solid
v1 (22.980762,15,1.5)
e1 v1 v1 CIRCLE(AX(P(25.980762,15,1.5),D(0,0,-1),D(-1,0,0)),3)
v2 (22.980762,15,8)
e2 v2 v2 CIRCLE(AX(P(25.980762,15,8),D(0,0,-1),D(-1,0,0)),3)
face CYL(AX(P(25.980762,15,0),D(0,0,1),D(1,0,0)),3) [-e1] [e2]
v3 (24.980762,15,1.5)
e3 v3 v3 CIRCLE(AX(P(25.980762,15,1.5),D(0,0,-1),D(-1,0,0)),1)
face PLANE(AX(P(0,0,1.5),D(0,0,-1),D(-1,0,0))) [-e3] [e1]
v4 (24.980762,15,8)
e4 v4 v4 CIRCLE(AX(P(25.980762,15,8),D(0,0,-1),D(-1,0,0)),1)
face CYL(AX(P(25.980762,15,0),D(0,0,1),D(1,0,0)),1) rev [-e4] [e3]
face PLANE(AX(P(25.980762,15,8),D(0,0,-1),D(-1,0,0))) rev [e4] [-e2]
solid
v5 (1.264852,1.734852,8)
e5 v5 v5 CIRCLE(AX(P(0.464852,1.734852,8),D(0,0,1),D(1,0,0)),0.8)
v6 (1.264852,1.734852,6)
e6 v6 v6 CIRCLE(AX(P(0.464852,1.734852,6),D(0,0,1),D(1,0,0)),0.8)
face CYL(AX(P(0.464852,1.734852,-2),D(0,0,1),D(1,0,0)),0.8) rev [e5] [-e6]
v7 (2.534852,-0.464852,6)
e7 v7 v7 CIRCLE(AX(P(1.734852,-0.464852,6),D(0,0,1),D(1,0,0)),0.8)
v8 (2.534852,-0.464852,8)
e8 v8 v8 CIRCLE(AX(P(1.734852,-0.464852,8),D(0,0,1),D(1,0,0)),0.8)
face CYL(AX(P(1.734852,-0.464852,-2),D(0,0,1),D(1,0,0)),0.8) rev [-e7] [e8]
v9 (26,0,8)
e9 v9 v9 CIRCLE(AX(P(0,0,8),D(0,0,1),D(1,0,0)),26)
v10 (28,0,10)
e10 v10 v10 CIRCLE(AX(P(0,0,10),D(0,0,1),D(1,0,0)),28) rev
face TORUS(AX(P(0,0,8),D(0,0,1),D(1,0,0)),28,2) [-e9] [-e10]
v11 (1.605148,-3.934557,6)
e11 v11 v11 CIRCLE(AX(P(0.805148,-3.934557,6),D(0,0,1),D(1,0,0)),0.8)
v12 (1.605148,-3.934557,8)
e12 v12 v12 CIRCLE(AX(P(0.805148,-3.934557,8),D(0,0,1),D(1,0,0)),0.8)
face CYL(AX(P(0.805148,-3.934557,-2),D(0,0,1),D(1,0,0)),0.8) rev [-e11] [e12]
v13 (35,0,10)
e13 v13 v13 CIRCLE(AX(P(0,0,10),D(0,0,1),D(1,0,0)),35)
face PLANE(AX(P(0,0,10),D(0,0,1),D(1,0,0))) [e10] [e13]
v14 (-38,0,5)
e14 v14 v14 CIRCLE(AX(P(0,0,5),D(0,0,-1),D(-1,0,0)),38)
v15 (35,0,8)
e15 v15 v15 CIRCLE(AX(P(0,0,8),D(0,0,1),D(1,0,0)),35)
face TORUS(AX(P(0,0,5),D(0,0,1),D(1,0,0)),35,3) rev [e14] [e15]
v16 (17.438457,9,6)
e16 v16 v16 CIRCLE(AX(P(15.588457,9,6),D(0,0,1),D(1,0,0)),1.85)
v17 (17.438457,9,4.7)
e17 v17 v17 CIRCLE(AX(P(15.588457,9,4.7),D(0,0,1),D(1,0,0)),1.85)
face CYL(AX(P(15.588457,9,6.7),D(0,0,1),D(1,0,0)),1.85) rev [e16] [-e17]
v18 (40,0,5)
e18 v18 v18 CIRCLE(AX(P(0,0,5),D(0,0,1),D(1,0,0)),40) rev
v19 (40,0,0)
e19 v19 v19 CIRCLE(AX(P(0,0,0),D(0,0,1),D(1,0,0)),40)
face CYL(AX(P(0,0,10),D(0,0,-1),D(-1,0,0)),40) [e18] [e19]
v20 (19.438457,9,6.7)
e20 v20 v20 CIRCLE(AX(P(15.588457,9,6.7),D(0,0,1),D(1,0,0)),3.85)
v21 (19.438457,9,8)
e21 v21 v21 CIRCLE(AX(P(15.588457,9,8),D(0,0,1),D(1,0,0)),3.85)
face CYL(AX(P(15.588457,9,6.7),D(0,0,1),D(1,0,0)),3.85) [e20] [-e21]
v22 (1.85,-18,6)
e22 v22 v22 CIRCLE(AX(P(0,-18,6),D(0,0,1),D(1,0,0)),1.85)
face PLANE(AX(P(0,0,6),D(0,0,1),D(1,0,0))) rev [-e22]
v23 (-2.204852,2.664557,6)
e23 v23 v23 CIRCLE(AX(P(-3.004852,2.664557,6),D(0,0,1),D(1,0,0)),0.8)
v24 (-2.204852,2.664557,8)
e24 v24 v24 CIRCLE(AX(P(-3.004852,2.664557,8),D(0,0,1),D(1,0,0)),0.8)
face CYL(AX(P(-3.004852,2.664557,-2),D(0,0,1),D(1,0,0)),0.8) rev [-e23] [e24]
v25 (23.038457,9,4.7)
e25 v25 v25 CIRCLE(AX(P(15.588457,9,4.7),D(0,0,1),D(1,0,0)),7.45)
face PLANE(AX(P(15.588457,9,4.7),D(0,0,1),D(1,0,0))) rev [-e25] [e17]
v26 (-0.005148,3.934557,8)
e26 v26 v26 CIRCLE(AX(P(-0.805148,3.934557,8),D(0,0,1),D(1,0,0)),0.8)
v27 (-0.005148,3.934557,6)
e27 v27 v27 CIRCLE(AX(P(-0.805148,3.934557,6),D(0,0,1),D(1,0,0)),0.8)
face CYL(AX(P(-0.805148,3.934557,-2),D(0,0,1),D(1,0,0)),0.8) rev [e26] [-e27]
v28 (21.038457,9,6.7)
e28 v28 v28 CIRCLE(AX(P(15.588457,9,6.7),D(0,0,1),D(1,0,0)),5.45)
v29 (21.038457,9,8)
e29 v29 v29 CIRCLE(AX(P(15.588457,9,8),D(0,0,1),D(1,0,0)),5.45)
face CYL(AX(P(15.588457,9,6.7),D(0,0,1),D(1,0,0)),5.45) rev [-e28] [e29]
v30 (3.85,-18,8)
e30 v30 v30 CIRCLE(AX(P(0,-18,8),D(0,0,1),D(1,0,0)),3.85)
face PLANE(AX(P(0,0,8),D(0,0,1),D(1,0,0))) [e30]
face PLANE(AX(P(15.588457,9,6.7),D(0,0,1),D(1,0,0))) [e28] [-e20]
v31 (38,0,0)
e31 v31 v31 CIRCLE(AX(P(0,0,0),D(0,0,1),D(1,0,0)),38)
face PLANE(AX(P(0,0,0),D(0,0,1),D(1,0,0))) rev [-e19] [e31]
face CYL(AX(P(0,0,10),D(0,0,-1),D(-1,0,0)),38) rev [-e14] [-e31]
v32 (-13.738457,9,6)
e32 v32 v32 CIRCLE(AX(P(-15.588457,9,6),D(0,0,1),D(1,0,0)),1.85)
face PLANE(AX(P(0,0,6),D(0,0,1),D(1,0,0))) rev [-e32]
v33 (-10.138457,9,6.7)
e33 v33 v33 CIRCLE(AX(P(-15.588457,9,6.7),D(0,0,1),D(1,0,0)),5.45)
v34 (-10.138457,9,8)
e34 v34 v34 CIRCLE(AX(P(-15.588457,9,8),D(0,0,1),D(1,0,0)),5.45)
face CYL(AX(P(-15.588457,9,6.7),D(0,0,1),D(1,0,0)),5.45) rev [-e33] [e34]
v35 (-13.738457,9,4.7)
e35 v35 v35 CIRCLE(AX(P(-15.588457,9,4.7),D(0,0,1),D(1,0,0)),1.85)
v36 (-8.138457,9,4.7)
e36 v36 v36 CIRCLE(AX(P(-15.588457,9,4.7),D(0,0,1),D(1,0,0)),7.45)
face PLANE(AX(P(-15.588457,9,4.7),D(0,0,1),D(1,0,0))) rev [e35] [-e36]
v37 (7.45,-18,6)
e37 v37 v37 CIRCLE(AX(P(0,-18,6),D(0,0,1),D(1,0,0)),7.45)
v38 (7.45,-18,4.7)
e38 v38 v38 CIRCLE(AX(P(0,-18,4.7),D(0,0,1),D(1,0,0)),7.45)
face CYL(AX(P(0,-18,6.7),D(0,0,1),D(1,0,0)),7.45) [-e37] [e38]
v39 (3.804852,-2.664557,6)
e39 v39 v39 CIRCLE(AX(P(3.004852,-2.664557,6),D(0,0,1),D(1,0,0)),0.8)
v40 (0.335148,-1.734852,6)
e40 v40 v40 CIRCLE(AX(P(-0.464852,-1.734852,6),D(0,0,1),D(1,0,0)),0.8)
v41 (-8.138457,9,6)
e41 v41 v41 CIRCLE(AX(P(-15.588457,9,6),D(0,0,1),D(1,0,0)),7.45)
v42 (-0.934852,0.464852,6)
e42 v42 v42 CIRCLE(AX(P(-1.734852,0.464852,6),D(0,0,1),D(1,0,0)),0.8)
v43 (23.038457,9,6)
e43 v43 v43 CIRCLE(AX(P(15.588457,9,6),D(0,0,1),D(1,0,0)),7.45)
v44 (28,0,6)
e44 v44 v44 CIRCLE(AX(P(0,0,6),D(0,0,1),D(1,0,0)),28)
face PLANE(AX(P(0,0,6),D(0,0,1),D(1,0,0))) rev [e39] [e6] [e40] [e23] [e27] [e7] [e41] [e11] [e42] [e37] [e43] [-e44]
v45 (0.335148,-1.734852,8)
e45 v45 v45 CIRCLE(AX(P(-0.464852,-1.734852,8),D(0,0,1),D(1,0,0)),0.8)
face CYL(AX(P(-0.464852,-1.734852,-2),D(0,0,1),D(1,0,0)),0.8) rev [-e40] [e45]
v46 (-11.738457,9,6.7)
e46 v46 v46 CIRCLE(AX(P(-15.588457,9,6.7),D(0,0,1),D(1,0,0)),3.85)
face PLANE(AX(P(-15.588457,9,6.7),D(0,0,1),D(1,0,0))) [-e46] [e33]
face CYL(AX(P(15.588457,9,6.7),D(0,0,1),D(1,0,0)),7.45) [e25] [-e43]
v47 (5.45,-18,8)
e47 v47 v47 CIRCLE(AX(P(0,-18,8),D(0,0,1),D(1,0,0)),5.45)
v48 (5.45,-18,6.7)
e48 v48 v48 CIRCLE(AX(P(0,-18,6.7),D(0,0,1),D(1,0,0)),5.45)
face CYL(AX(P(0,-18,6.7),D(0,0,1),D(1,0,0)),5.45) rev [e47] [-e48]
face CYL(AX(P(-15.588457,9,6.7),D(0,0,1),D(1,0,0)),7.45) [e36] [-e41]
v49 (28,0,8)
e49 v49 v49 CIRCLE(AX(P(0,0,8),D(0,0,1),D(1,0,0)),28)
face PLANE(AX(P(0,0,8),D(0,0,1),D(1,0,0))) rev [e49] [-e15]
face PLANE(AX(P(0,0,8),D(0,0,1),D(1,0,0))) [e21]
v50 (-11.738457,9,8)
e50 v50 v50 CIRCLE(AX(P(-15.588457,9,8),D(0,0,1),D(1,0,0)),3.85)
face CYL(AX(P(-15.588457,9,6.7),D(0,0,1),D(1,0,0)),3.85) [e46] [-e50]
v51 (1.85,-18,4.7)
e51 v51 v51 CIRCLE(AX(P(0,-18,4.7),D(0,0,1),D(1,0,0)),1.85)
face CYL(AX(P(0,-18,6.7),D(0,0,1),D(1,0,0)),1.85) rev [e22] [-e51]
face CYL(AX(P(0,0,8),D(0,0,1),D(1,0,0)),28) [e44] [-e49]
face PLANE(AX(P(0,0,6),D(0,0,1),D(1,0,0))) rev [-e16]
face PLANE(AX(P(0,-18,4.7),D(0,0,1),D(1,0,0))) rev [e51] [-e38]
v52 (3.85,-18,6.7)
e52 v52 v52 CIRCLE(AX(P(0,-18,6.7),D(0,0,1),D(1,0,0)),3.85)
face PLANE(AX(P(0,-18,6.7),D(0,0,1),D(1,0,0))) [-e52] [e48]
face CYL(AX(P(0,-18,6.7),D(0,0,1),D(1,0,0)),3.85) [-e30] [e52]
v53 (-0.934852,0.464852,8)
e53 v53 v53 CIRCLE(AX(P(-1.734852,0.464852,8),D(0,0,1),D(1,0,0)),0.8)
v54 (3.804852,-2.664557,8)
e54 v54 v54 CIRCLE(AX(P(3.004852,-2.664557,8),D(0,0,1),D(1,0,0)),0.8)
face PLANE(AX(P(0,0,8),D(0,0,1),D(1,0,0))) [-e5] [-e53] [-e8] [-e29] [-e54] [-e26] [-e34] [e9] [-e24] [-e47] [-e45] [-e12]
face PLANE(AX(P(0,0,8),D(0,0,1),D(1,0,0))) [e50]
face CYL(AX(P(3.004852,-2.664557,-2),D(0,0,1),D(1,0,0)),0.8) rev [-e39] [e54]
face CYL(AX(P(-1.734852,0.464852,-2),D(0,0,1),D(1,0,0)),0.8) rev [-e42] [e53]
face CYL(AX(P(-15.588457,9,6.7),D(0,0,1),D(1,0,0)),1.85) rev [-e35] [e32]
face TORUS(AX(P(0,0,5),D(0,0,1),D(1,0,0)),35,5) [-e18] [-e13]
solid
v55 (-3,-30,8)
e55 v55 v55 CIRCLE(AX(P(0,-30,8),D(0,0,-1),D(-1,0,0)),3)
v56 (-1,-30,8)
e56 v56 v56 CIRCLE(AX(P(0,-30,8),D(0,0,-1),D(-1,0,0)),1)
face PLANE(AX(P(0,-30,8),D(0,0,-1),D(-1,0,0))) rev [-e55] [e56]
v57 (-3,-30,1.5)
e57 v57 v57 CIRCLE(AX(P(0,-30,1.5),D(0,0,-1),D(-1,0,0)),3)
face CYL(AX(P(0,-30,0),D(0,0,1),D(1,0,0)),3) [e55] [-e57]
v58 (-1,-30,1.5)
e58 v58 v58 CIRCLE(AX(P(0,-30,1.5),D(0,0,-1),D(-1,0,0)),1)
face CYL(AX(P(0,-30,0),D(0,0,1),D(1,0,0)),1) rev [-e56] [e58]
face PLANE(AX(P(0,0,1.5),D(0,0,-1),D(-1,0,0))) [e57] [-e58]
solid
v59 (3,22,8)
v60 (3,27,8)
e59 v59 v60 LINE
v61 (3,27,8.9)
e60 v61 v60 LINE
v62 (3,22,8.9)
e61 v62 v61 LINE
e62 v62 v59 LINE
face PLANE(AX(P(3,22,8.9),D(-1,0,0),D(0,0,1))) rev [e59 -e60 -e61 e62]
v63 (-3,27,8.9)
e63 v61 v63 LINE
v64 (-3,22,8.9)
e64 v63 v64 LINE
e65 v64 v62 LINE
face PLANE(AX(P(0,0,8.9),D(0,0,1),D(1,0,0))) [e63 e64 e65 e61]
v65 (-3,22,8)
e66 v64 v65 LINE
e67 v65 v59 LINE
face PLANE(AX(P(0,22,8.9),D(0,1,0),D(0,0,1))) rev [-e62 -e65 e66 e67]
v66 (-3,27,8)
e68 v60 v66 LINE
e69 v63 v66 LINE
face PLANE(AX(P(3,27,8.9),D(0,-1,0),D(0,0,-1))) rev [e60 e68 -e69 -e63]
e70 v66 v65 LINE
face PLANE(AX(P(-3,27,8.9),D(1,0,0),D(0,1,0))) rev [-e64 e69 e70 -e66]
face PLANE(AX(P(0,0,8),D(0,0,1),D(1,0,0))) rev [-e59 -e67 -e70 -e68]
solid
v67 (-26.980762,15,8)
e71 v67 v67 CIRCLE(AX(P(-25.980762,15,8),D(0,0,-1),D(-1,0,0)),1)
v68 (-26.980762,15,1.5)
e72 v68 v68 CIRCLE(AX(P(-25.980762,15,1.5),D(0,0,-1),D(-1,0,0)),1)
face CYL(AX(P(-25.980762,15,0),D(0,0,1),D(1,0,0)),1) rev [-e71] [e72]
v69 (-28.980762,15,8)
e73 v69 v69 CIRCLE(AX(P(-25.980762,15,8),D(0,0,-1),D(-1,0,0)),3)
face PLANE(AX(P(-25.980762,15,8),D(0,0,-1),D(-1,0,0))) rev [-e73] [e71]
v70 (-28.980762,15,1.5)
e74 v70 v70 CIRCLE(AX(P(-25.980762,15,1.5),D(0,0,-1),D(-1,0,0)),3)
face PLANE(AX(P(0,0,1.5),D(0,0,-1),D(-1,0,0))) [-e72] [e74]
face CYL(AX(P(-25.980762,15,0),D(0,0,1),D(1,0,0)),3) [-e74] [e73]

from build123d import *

# Parameters (mm, degrees)
SKETCH_1_R          = 40
EXTRUDE_1_DEPTH     = 10
SKETCH_3_R          = 26
CUT_EXTRUDE_1_DEPTH = 2
FILLET_2_R          = 5
SKETCH_7_R          = 5.45
SKETCH_7_R_2        = 3.85
CUT_EXTRUDE_3_DEPTH = 1.3
SHELL_2_T           = -2
SKETCH_9_R          = 3
SKETCH_9_R_2        = 1
EXTRUDE_2_DEPTH     = 8
EXTRUDE_2_2_DEPTH   = 8
EXTRUDE_2_3_DEPTH   = 8
EXTRUDE_5_DEPTH     = 0.9
SKETCH_11_R         = 33.900647102
CUT_EXTRUDE_5_DEPTH = 1.5
FILLET_3_R          = 2
SKETCH_12_R         = 0.8
CUT_EXTRUDE_6_DEPTH = 10


with BuildPart() as part:
    # 草图1 → 凸台-拉伸1 (new body)
    with BuildSketch(Plane.XY):
        Circle(SKETCH_1_R)
    extrude(amount=EXTRUDE_1_DEPTH)

    # 草图3 → 切除-拉伸1 (cut)
    with BuildSketch(Plane.XY.offset(10)):
        Circle(SKETCH_3_R)
    extrude(amount=-CUT_EXTRUDE_1_DEPTH, mode=Mode.SUBTRACT)

    # 圆角2
    fillet_2_edges = [part.edges().sort_by_distance(p)[0] for p in [
        (-40, 0, 10),
    ]]
    fillet(fillet_2_edges, radius=FILLET_2_R)

    # 草图7 → 切除-拉伸3 (cut)
    # profile 1 of 3: a face of its own
    with BuildSketch(Plane.XY.offset(8)):
        with Locations((0, -18)):
            Circle(SKETCH_7_R)
        with Locations((0, -18)):
            Circle(SKETCH_7_R_2, mode=Mode.SUBTRACT)
    # profile 2 of 3: a face of its own
    with BuildSketch(Plane.XY.offset(8)):
        with Locations((-15.588457268, 9)):
            Circle(SKETCH_7_R)
        with Locations((-15.588457268, 9)):
            Circle(SKETCH_7_R_2, mode=Mode.SUBTRACT)
    # profile 3 of 3: a face of its own
    with BuildSketch(Plane.XY.offset(8)):
        with Locations((15.588457268, 9)):
            Circle(SKETCH_7_R)
        with Locations((15.588457268, 9)):
            Circle(SKETCH_7_R_2, mode=Mode.SUBTRACT)
    extrude(amount=-CUT_EXTRUDE_3_DEPTH, mode=Mode.SUBTRACT)

    # 抽壳2
    shell_2_openings = [part.faces().sort_by_distance(p)[0] for p in [
        (0, 0, 0),
    ]]
    offset(amount=SHELL_2_T, openings=shell_2_openings, kind=Kind.INTERSECTION)

    # 圆角3
    fillet_3_edges = [part.edges().sort_by_distance(p)[0] for p in [
        (-26, 0, 10),
    ]]
    fillet(fillet_3_edges, radius=FILLET_3_R - 0.0001)  # a hair under: the kernel refuses the full size

    # 草图12 → 切除-拉伸6 (cut)
    with BuildSketch(Plane.XY.offset(8)):
        with Locations((-0.805147737, 3.934556788)):
            Circle(SKETCH_12_R)
        with Locations((0.464852263, 1.734852263)):
            Circle(SKETCH_12_R)
        with Locations((1.734852263, -0.464852263)):
            Circle(SKETCH_12_R)
        with Locations((3.004852263, -2.664556788)):
            Circle(SKETCH_12_R)
        with Locations((-1.734852263, 0.464852263)):
            Circle(SKETCH_12_R)
        with Locations((-0.464852263, -1.734852263)):
            Circle(SKETCH_12_R)
        with Locations((0.805147737, -3.934556788)):
            Circle(SKETCH_12_R)
        with Locations((-3.004852263, 2.664556788)):
            Circle(SKETCH_12_R)
    extrude(amount=-CUT_EXTRUDE_6_DEPTH, mode=Mode.SUBTRACT)


with BuildPart() as body_2:
    # 草图9 → 凸台-拉伸2 (new body)
    with BuildSketch(Plane(origin=(0, 0, 8), x_dir=(-1, 0, 0), z_dir=(0, 0, -1))):
        with Locations((0, -30)):
            Circle(SKETCH_9_R)
        with Locations((0, -30)):
            Circle(SKETCH_9_R_2, mode=Mode.SUBTRACT)
    extrude(amount=EXTRUDE_2_DEPTH)


with BuildPart() as body_3:
    # 草图9 → Extrude 2 2 (new body)
    with BuildSketch(Plane(origin=(0, 0, 8), x_dir=(-1, 0, 0), z_dir=(0, 0, -1))):
        with Locations((-25.980762114, 15)):
            Circle(SKETCH_9_R)
        with Locations((-25.980762114, 15)):
            Circle(SKETCH_9_R_2, mode=Mode.SUBTRACT)
    extrude(amount=EXTRUDE_2_2_DEPTH)


with BuildPart() as body_4:
    # 草图9 → Extrude 2 3 (new body)
    with BuildSketch(Plane(origin=(0, 0, 8), x_dir=(-1, 0, 0), z_dir=(0, 0, -1))):
        with Locations((25.980762114, 15)):
            Circle(SKETCH_9_R)
        with Locations((25.980762114, 15)):
            Circle(SKETCH_9_R_2, mode=Mode.SUBTRACT)
    extrude(amount=EXTRUDE_2_3_DEPTH)


with BuildPart() as body_5:
    # 草图10 → 凸台-拉伸5 (new body)
    with BuildSketch(Plane.XY.offset(8)):
        Polygon((0, 22), (3, 22), (3, 27), (-3, 27), (-3, 22), align=None)
    extrude(amount=EXTRUDE_5_DEPTH)


with BuildPart() as cut_extrude_5_tool:
    # 草图11 → 切除-拉伸5 (new body)
    with BuildSketch(Plane(origin=(0, 0, 0), x_dir=(-1, 0, 0), z_dir=(0, 0, -1))):
        Circle(SKETCH_11_R)
    extrude(amount=-CUT_EXTRUDE_5_DEPTH)


with BuildPart() as body_2_1:
    add(body_2.part)

    # 切除-拉伸5: cut by cut_extrude_5_tool
    add(cut_extrude_5_tool.part, mode=Mode.SUBTRACT)


with BuildPart() as body_3_1:
    add(body_3.part)

    # 切除-拉伸5: cut by cut_extrude_5_tool
    add(cut_extrude_5_tool.part, mode=Mode.SUBTRACT)


with BuildPart() as body_4_1:
    add(body_4.part)

    # 切除-拉伸5: cut by cut_extrude_5_tool
    add(cut_extrude_5_tool.part, mode=Mode.SUBTRACT)


solid = Compound([part.part, body_5.part, body_2_1.part, body_3_1.part, body_4_1.part])
